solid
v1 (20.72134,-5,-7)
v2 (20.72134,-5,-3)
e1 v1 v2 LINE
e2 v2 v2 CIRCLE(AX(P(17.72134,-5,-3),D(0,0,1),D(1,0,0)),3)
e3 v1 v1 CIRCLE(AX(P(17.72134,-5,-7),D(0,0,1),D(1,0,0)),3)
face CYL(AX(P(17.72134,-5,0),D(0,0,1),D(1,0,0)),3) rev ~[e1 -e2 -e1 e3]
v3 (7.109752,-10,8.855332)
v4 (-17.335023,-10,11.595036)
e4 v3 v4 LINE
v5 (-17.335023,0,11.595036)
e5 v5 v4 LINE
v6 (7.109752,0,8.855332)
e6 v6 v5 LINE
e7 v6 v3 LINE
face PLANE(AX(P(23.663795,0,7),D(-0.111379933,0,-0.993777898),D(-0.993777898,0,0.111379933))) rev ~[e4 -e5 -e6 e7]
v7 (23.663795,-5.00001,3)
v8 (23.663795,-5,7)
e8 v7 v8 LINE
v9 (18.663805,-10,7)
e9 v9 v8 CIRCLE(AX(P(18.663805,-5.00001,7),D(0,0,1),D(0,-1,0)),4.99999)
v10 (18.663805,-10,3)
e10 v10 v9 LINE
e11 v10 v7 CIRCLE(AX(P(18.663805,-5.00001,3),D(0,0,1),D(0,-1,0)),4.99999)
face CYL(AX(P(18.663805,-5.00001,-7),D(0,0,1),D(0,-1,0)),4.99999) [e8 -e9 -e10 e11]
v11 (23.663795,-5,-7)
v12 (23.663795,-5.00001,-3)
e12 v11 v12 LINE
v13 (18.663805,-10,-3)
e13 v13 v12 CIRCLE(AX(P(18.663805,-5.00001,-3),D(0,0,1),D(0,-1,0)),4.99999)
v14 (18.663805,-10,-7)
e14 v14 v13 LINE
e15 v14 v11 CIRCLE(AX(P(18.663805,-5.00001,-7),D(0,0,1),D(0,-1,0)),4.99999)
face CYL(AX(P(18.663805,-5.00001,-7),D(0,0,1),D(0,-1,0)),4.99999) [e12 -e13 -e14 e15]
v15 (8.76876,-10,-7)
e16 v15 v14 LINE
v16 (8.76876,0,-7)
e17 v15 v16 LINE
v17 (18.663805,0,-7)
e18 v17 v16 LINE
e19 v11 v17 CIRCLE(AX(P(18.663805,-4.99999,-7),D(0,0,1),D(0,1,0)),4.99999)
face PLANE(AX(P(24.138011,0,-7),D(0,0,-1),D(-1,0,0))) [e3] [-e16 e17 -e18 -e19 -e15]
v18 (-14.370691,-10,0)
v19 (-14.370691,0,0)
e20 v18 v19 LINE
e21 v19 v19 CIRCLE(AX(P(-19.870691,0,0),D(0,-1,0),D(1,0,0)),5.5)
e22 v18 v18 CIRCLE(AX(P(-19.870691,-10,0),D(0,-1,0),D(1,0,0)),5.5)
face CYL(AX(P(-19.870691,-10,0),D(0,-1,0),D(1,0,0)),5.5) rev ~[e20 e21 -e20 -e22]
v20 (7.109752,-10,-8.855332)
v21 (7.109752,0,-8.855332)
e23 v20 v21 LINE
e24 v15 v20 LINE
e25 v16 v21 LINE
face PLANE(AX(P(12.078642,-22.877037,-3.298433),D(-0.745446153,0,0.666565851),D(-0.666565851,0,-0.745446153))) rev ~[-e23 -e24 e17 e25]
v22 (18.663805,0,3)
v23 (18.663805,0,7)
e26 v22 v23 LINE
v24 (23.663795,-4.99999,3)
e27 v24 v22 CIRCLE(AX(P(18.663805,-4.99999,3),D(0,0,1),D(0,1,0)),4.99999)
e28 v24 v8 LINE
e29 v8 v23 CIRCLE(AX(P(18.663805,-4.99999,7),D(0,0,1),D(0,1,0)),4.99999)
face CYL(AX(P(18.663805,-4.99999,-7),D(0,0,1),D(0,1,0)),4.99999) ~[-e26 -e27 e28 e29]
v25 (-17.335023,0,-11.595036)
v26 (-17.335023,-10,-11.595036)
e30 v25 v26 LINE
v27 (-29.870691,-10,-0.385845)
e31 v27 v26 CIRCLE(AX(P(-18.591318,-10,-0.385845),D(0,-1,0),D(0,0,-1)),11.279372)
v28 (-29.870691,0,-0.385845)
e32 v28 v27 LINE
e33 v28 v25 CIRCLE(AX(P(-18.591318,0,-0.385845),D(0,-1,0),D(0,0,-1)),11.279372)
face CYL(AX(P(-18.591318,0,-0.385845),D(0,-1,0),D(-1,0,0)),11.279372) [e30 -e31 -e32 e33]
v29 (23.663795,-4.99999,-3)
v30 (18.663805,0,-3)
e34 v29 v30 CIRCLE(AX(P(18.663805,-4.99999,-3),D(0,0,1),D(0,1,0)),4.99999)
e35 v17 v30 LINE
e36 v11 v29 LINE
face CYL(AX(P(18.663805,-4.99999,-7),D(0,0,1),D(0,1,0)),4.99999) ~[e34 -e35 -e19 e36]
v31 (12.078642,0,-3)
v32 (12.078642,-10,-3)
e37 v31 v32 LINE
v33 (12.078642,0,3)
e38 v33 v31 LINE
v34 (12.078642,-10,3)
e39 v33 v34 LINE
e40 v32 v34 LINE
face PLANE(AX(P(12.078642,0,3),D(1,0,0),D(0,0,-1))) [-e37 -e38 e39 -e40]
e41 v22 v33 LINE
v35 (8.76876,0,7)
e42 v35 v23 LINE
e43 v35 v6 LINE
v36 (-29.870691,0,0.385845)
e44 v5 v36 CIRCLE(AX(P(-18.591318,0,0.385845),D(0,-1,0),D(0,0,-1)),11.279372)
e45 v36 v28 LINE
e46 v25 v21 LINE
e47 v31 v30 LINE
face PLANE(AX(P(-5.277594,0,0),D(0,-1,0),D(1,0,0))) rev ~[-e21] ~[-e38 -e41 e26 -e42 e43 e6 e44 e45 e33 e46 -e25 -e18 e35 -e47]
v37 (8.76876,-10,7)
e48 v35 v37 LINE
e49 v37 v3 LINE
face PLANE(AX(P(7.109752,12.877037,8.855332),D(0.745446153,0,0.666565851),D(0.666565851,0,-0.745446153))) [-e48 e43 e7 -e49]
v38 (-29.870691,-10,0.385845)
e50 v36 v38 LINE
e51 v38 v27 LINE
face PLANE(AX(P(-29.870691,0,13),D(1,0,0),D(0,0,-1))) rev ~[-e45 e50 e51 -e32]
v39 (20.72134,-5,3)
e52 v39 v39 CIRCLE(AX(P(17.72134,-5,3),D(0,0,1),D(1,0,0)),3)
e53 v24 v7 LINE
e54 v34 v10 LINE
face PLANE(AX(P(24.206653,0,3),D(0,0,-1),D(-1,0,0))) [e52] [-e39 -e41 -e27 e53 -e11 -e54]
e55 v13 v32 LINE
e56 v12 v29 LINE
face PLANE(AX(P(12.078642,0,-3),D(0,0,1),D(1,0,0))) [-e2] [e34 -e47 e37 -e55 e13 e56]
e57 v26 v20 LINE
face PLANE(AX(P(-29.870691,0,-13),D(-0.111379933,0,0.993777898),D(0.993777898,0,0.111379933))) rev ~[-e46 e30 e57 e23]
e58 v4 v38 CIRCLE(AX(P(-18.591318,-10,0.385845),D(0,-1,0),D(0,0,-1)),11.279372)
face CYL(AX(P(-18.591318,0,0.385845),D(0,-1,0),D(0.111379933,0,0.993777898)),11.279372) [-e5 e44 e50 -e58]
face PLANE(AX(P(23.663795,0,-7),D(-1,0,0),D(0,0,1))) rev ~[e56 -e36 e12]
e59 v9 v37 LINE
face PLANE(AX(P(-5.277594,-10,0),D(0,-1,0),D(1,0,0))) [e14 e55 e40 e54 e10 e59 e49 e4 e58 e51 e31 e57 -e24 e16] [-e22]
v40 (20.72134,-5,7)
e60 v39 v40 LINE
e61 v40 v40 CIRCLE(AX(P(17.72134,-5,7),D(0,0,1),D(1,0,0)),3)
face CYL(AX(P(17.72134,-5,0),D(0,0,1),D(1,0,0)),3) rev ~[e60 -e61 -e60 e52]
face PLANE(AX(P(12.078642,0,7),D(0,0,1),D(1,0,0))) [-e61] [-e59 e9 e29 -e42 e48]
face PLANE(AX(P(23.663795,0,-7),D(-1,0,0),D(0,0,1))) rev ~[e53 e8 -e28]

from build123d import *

# Parameters (mm, degrees)
F1_DEPTH     = 10
F3_DEPTH     = 25
F4_R         = 3
F5_DEPTH     = 12.5
F6_R         = 4.99999
F7_R         = 11.2793724654
F8_W         = 12.0593691245
F8_H         = 3
F9_DEPTH     = 25
F10_T4_DEPTH = 35.7540736123
F10_T9_DEPTH = 35.7540736123


# Not quite as in the source:
# - a fillet or chamfer that OpenCascade refuses, or shapes differently, is made with other operations: its cross-section is extruded or revolved along the edge and cut away or added
# - a fillet or chamfer is up to 0.001 mm smaller than in the source, because OpenCascade refuses the exact size


with BuildPart() as f1:
    # F0 (on Front) → F1 (new body)
    with BuildSketch(Plane.XZ):
        Polygon((-29.8706907779, 13), (-29.8706907779, 0), (-29.8706907779, -13), (23.6637946218, -7), (23.6637946218, 0), (23.6637946218, 7), align=None)
    extrude(amount=F1_DEPTH)

    # F2 (on face) → F3 (cut)
    with BuildSketch(Plane.XZ.offset(10)):
        with BuildLine():
            ThreePointArc((-25.3706907779, 0), (-19.8706907779, -5.5), (-14.3706907779, 0))
            ThreePointArc((-14.3706907779, 0), (-19.8706907779, 5.5), (-25.3706907779, 0))
        make_face()
    extrude(amount=-F3_DEPTH, mode=Mode.SUBTRACT)

    # F4 (on Top) → F5 (cut, symmetric)
    with BuildSketch(Plane.XY):
        with Locations((17.7213400602, -4.9999998882)):
            Circle(F4_R)
    extrude(amount=F5_DEPTH, both=True, mode=Mode.SUBTRACT)

    # F6 (radius 5 in the source; OpenCascade refuses exactly that, so slightly less here)
    f6_edges = [f1.edges().sort_by_distance(p)[0] for p in [
        (23.663795, -10, 0),
        (23.663795, 0, 0),
    ]]
    fillet(f6_edges, radius=F6_R)

    # F7
    f7_edges = [f1.edges().sort_by_distance(p)[0] for p in [
        (-29.870691, -5, 13),
        (-29.870691, -5, -13),
    ]]
    fillet(f7_edges, radius=F7_R)

    # F8 (on Front) → F9 (cut)
    with BuildSketch(Plane.XZ):
        Polygon((12.0786419138, 3), (12.0786419138, 0), (24.1380110383, 0), (24.2066532373, 3), align=None)
        with Locations((18.1083264761, -1.5)):
            Rectangle(F8_W, F8_H)
        Polygon((25.2308808267, -17.6116619259), (24.1380110383, -7), (12.0786419138, -7), (12.0786419138, -17.6116619259), align=None)
        Polygon((12.0786419138, 14.7170173004), (12.0786419138, 7), (24.2066532373, 7), (23.395627737, 15.3522975743), align=None)
    extrude(amount=F9_DEPTH, mode=Mode.SUBTRACT)

    # F10: chamfer of 5 on 2 edges, made by hand


with BuildPart() as f10_tool2:
    # F10_s3 → F10_t4 (new body)
    with BuildSketch(Plane.XZ.offset(22.8770368062)):
        Polygon((12.0786419138, -3.29843251), (7.1097524238, -8.8553321741), (12.0786419138, -8.29843251), align=None)
    extrude(amount=-F10_T4_DEPTH)

    split(bisect_by=Plane.XY.offset(-7), keep=Keep.BOTTOM)


with BuildPart() as f1_1:
    add(f1.part)

    # F10_t1: cut F10_tool2
    add(f10_tool2.part, mode=Mode.SUBTRACT)


with BuildPart() as f10_tool7:
    # F10_s8 → F10_t9 (new body)
    with BuildSketch(Plane.XZ.offset(-12.8770368062)):
        Polygon((7.1097524238, 8.8553321741), (12.0786419138, 3.29843251), (12.0786419138, 8.29843251), align=None)
    extrude(amount=F10_T9_DEPTH)

    split(bisect_by=Plane.XY.offset(7), keep=Keep.TOP)


with BuildPart() as f1_2:
    add(f1_1.part)

    # F10_t6: cut F10_tool7
    add(f10_tool7.part, mode=Mode.SUBTRACT)


solid = f1_2.part
